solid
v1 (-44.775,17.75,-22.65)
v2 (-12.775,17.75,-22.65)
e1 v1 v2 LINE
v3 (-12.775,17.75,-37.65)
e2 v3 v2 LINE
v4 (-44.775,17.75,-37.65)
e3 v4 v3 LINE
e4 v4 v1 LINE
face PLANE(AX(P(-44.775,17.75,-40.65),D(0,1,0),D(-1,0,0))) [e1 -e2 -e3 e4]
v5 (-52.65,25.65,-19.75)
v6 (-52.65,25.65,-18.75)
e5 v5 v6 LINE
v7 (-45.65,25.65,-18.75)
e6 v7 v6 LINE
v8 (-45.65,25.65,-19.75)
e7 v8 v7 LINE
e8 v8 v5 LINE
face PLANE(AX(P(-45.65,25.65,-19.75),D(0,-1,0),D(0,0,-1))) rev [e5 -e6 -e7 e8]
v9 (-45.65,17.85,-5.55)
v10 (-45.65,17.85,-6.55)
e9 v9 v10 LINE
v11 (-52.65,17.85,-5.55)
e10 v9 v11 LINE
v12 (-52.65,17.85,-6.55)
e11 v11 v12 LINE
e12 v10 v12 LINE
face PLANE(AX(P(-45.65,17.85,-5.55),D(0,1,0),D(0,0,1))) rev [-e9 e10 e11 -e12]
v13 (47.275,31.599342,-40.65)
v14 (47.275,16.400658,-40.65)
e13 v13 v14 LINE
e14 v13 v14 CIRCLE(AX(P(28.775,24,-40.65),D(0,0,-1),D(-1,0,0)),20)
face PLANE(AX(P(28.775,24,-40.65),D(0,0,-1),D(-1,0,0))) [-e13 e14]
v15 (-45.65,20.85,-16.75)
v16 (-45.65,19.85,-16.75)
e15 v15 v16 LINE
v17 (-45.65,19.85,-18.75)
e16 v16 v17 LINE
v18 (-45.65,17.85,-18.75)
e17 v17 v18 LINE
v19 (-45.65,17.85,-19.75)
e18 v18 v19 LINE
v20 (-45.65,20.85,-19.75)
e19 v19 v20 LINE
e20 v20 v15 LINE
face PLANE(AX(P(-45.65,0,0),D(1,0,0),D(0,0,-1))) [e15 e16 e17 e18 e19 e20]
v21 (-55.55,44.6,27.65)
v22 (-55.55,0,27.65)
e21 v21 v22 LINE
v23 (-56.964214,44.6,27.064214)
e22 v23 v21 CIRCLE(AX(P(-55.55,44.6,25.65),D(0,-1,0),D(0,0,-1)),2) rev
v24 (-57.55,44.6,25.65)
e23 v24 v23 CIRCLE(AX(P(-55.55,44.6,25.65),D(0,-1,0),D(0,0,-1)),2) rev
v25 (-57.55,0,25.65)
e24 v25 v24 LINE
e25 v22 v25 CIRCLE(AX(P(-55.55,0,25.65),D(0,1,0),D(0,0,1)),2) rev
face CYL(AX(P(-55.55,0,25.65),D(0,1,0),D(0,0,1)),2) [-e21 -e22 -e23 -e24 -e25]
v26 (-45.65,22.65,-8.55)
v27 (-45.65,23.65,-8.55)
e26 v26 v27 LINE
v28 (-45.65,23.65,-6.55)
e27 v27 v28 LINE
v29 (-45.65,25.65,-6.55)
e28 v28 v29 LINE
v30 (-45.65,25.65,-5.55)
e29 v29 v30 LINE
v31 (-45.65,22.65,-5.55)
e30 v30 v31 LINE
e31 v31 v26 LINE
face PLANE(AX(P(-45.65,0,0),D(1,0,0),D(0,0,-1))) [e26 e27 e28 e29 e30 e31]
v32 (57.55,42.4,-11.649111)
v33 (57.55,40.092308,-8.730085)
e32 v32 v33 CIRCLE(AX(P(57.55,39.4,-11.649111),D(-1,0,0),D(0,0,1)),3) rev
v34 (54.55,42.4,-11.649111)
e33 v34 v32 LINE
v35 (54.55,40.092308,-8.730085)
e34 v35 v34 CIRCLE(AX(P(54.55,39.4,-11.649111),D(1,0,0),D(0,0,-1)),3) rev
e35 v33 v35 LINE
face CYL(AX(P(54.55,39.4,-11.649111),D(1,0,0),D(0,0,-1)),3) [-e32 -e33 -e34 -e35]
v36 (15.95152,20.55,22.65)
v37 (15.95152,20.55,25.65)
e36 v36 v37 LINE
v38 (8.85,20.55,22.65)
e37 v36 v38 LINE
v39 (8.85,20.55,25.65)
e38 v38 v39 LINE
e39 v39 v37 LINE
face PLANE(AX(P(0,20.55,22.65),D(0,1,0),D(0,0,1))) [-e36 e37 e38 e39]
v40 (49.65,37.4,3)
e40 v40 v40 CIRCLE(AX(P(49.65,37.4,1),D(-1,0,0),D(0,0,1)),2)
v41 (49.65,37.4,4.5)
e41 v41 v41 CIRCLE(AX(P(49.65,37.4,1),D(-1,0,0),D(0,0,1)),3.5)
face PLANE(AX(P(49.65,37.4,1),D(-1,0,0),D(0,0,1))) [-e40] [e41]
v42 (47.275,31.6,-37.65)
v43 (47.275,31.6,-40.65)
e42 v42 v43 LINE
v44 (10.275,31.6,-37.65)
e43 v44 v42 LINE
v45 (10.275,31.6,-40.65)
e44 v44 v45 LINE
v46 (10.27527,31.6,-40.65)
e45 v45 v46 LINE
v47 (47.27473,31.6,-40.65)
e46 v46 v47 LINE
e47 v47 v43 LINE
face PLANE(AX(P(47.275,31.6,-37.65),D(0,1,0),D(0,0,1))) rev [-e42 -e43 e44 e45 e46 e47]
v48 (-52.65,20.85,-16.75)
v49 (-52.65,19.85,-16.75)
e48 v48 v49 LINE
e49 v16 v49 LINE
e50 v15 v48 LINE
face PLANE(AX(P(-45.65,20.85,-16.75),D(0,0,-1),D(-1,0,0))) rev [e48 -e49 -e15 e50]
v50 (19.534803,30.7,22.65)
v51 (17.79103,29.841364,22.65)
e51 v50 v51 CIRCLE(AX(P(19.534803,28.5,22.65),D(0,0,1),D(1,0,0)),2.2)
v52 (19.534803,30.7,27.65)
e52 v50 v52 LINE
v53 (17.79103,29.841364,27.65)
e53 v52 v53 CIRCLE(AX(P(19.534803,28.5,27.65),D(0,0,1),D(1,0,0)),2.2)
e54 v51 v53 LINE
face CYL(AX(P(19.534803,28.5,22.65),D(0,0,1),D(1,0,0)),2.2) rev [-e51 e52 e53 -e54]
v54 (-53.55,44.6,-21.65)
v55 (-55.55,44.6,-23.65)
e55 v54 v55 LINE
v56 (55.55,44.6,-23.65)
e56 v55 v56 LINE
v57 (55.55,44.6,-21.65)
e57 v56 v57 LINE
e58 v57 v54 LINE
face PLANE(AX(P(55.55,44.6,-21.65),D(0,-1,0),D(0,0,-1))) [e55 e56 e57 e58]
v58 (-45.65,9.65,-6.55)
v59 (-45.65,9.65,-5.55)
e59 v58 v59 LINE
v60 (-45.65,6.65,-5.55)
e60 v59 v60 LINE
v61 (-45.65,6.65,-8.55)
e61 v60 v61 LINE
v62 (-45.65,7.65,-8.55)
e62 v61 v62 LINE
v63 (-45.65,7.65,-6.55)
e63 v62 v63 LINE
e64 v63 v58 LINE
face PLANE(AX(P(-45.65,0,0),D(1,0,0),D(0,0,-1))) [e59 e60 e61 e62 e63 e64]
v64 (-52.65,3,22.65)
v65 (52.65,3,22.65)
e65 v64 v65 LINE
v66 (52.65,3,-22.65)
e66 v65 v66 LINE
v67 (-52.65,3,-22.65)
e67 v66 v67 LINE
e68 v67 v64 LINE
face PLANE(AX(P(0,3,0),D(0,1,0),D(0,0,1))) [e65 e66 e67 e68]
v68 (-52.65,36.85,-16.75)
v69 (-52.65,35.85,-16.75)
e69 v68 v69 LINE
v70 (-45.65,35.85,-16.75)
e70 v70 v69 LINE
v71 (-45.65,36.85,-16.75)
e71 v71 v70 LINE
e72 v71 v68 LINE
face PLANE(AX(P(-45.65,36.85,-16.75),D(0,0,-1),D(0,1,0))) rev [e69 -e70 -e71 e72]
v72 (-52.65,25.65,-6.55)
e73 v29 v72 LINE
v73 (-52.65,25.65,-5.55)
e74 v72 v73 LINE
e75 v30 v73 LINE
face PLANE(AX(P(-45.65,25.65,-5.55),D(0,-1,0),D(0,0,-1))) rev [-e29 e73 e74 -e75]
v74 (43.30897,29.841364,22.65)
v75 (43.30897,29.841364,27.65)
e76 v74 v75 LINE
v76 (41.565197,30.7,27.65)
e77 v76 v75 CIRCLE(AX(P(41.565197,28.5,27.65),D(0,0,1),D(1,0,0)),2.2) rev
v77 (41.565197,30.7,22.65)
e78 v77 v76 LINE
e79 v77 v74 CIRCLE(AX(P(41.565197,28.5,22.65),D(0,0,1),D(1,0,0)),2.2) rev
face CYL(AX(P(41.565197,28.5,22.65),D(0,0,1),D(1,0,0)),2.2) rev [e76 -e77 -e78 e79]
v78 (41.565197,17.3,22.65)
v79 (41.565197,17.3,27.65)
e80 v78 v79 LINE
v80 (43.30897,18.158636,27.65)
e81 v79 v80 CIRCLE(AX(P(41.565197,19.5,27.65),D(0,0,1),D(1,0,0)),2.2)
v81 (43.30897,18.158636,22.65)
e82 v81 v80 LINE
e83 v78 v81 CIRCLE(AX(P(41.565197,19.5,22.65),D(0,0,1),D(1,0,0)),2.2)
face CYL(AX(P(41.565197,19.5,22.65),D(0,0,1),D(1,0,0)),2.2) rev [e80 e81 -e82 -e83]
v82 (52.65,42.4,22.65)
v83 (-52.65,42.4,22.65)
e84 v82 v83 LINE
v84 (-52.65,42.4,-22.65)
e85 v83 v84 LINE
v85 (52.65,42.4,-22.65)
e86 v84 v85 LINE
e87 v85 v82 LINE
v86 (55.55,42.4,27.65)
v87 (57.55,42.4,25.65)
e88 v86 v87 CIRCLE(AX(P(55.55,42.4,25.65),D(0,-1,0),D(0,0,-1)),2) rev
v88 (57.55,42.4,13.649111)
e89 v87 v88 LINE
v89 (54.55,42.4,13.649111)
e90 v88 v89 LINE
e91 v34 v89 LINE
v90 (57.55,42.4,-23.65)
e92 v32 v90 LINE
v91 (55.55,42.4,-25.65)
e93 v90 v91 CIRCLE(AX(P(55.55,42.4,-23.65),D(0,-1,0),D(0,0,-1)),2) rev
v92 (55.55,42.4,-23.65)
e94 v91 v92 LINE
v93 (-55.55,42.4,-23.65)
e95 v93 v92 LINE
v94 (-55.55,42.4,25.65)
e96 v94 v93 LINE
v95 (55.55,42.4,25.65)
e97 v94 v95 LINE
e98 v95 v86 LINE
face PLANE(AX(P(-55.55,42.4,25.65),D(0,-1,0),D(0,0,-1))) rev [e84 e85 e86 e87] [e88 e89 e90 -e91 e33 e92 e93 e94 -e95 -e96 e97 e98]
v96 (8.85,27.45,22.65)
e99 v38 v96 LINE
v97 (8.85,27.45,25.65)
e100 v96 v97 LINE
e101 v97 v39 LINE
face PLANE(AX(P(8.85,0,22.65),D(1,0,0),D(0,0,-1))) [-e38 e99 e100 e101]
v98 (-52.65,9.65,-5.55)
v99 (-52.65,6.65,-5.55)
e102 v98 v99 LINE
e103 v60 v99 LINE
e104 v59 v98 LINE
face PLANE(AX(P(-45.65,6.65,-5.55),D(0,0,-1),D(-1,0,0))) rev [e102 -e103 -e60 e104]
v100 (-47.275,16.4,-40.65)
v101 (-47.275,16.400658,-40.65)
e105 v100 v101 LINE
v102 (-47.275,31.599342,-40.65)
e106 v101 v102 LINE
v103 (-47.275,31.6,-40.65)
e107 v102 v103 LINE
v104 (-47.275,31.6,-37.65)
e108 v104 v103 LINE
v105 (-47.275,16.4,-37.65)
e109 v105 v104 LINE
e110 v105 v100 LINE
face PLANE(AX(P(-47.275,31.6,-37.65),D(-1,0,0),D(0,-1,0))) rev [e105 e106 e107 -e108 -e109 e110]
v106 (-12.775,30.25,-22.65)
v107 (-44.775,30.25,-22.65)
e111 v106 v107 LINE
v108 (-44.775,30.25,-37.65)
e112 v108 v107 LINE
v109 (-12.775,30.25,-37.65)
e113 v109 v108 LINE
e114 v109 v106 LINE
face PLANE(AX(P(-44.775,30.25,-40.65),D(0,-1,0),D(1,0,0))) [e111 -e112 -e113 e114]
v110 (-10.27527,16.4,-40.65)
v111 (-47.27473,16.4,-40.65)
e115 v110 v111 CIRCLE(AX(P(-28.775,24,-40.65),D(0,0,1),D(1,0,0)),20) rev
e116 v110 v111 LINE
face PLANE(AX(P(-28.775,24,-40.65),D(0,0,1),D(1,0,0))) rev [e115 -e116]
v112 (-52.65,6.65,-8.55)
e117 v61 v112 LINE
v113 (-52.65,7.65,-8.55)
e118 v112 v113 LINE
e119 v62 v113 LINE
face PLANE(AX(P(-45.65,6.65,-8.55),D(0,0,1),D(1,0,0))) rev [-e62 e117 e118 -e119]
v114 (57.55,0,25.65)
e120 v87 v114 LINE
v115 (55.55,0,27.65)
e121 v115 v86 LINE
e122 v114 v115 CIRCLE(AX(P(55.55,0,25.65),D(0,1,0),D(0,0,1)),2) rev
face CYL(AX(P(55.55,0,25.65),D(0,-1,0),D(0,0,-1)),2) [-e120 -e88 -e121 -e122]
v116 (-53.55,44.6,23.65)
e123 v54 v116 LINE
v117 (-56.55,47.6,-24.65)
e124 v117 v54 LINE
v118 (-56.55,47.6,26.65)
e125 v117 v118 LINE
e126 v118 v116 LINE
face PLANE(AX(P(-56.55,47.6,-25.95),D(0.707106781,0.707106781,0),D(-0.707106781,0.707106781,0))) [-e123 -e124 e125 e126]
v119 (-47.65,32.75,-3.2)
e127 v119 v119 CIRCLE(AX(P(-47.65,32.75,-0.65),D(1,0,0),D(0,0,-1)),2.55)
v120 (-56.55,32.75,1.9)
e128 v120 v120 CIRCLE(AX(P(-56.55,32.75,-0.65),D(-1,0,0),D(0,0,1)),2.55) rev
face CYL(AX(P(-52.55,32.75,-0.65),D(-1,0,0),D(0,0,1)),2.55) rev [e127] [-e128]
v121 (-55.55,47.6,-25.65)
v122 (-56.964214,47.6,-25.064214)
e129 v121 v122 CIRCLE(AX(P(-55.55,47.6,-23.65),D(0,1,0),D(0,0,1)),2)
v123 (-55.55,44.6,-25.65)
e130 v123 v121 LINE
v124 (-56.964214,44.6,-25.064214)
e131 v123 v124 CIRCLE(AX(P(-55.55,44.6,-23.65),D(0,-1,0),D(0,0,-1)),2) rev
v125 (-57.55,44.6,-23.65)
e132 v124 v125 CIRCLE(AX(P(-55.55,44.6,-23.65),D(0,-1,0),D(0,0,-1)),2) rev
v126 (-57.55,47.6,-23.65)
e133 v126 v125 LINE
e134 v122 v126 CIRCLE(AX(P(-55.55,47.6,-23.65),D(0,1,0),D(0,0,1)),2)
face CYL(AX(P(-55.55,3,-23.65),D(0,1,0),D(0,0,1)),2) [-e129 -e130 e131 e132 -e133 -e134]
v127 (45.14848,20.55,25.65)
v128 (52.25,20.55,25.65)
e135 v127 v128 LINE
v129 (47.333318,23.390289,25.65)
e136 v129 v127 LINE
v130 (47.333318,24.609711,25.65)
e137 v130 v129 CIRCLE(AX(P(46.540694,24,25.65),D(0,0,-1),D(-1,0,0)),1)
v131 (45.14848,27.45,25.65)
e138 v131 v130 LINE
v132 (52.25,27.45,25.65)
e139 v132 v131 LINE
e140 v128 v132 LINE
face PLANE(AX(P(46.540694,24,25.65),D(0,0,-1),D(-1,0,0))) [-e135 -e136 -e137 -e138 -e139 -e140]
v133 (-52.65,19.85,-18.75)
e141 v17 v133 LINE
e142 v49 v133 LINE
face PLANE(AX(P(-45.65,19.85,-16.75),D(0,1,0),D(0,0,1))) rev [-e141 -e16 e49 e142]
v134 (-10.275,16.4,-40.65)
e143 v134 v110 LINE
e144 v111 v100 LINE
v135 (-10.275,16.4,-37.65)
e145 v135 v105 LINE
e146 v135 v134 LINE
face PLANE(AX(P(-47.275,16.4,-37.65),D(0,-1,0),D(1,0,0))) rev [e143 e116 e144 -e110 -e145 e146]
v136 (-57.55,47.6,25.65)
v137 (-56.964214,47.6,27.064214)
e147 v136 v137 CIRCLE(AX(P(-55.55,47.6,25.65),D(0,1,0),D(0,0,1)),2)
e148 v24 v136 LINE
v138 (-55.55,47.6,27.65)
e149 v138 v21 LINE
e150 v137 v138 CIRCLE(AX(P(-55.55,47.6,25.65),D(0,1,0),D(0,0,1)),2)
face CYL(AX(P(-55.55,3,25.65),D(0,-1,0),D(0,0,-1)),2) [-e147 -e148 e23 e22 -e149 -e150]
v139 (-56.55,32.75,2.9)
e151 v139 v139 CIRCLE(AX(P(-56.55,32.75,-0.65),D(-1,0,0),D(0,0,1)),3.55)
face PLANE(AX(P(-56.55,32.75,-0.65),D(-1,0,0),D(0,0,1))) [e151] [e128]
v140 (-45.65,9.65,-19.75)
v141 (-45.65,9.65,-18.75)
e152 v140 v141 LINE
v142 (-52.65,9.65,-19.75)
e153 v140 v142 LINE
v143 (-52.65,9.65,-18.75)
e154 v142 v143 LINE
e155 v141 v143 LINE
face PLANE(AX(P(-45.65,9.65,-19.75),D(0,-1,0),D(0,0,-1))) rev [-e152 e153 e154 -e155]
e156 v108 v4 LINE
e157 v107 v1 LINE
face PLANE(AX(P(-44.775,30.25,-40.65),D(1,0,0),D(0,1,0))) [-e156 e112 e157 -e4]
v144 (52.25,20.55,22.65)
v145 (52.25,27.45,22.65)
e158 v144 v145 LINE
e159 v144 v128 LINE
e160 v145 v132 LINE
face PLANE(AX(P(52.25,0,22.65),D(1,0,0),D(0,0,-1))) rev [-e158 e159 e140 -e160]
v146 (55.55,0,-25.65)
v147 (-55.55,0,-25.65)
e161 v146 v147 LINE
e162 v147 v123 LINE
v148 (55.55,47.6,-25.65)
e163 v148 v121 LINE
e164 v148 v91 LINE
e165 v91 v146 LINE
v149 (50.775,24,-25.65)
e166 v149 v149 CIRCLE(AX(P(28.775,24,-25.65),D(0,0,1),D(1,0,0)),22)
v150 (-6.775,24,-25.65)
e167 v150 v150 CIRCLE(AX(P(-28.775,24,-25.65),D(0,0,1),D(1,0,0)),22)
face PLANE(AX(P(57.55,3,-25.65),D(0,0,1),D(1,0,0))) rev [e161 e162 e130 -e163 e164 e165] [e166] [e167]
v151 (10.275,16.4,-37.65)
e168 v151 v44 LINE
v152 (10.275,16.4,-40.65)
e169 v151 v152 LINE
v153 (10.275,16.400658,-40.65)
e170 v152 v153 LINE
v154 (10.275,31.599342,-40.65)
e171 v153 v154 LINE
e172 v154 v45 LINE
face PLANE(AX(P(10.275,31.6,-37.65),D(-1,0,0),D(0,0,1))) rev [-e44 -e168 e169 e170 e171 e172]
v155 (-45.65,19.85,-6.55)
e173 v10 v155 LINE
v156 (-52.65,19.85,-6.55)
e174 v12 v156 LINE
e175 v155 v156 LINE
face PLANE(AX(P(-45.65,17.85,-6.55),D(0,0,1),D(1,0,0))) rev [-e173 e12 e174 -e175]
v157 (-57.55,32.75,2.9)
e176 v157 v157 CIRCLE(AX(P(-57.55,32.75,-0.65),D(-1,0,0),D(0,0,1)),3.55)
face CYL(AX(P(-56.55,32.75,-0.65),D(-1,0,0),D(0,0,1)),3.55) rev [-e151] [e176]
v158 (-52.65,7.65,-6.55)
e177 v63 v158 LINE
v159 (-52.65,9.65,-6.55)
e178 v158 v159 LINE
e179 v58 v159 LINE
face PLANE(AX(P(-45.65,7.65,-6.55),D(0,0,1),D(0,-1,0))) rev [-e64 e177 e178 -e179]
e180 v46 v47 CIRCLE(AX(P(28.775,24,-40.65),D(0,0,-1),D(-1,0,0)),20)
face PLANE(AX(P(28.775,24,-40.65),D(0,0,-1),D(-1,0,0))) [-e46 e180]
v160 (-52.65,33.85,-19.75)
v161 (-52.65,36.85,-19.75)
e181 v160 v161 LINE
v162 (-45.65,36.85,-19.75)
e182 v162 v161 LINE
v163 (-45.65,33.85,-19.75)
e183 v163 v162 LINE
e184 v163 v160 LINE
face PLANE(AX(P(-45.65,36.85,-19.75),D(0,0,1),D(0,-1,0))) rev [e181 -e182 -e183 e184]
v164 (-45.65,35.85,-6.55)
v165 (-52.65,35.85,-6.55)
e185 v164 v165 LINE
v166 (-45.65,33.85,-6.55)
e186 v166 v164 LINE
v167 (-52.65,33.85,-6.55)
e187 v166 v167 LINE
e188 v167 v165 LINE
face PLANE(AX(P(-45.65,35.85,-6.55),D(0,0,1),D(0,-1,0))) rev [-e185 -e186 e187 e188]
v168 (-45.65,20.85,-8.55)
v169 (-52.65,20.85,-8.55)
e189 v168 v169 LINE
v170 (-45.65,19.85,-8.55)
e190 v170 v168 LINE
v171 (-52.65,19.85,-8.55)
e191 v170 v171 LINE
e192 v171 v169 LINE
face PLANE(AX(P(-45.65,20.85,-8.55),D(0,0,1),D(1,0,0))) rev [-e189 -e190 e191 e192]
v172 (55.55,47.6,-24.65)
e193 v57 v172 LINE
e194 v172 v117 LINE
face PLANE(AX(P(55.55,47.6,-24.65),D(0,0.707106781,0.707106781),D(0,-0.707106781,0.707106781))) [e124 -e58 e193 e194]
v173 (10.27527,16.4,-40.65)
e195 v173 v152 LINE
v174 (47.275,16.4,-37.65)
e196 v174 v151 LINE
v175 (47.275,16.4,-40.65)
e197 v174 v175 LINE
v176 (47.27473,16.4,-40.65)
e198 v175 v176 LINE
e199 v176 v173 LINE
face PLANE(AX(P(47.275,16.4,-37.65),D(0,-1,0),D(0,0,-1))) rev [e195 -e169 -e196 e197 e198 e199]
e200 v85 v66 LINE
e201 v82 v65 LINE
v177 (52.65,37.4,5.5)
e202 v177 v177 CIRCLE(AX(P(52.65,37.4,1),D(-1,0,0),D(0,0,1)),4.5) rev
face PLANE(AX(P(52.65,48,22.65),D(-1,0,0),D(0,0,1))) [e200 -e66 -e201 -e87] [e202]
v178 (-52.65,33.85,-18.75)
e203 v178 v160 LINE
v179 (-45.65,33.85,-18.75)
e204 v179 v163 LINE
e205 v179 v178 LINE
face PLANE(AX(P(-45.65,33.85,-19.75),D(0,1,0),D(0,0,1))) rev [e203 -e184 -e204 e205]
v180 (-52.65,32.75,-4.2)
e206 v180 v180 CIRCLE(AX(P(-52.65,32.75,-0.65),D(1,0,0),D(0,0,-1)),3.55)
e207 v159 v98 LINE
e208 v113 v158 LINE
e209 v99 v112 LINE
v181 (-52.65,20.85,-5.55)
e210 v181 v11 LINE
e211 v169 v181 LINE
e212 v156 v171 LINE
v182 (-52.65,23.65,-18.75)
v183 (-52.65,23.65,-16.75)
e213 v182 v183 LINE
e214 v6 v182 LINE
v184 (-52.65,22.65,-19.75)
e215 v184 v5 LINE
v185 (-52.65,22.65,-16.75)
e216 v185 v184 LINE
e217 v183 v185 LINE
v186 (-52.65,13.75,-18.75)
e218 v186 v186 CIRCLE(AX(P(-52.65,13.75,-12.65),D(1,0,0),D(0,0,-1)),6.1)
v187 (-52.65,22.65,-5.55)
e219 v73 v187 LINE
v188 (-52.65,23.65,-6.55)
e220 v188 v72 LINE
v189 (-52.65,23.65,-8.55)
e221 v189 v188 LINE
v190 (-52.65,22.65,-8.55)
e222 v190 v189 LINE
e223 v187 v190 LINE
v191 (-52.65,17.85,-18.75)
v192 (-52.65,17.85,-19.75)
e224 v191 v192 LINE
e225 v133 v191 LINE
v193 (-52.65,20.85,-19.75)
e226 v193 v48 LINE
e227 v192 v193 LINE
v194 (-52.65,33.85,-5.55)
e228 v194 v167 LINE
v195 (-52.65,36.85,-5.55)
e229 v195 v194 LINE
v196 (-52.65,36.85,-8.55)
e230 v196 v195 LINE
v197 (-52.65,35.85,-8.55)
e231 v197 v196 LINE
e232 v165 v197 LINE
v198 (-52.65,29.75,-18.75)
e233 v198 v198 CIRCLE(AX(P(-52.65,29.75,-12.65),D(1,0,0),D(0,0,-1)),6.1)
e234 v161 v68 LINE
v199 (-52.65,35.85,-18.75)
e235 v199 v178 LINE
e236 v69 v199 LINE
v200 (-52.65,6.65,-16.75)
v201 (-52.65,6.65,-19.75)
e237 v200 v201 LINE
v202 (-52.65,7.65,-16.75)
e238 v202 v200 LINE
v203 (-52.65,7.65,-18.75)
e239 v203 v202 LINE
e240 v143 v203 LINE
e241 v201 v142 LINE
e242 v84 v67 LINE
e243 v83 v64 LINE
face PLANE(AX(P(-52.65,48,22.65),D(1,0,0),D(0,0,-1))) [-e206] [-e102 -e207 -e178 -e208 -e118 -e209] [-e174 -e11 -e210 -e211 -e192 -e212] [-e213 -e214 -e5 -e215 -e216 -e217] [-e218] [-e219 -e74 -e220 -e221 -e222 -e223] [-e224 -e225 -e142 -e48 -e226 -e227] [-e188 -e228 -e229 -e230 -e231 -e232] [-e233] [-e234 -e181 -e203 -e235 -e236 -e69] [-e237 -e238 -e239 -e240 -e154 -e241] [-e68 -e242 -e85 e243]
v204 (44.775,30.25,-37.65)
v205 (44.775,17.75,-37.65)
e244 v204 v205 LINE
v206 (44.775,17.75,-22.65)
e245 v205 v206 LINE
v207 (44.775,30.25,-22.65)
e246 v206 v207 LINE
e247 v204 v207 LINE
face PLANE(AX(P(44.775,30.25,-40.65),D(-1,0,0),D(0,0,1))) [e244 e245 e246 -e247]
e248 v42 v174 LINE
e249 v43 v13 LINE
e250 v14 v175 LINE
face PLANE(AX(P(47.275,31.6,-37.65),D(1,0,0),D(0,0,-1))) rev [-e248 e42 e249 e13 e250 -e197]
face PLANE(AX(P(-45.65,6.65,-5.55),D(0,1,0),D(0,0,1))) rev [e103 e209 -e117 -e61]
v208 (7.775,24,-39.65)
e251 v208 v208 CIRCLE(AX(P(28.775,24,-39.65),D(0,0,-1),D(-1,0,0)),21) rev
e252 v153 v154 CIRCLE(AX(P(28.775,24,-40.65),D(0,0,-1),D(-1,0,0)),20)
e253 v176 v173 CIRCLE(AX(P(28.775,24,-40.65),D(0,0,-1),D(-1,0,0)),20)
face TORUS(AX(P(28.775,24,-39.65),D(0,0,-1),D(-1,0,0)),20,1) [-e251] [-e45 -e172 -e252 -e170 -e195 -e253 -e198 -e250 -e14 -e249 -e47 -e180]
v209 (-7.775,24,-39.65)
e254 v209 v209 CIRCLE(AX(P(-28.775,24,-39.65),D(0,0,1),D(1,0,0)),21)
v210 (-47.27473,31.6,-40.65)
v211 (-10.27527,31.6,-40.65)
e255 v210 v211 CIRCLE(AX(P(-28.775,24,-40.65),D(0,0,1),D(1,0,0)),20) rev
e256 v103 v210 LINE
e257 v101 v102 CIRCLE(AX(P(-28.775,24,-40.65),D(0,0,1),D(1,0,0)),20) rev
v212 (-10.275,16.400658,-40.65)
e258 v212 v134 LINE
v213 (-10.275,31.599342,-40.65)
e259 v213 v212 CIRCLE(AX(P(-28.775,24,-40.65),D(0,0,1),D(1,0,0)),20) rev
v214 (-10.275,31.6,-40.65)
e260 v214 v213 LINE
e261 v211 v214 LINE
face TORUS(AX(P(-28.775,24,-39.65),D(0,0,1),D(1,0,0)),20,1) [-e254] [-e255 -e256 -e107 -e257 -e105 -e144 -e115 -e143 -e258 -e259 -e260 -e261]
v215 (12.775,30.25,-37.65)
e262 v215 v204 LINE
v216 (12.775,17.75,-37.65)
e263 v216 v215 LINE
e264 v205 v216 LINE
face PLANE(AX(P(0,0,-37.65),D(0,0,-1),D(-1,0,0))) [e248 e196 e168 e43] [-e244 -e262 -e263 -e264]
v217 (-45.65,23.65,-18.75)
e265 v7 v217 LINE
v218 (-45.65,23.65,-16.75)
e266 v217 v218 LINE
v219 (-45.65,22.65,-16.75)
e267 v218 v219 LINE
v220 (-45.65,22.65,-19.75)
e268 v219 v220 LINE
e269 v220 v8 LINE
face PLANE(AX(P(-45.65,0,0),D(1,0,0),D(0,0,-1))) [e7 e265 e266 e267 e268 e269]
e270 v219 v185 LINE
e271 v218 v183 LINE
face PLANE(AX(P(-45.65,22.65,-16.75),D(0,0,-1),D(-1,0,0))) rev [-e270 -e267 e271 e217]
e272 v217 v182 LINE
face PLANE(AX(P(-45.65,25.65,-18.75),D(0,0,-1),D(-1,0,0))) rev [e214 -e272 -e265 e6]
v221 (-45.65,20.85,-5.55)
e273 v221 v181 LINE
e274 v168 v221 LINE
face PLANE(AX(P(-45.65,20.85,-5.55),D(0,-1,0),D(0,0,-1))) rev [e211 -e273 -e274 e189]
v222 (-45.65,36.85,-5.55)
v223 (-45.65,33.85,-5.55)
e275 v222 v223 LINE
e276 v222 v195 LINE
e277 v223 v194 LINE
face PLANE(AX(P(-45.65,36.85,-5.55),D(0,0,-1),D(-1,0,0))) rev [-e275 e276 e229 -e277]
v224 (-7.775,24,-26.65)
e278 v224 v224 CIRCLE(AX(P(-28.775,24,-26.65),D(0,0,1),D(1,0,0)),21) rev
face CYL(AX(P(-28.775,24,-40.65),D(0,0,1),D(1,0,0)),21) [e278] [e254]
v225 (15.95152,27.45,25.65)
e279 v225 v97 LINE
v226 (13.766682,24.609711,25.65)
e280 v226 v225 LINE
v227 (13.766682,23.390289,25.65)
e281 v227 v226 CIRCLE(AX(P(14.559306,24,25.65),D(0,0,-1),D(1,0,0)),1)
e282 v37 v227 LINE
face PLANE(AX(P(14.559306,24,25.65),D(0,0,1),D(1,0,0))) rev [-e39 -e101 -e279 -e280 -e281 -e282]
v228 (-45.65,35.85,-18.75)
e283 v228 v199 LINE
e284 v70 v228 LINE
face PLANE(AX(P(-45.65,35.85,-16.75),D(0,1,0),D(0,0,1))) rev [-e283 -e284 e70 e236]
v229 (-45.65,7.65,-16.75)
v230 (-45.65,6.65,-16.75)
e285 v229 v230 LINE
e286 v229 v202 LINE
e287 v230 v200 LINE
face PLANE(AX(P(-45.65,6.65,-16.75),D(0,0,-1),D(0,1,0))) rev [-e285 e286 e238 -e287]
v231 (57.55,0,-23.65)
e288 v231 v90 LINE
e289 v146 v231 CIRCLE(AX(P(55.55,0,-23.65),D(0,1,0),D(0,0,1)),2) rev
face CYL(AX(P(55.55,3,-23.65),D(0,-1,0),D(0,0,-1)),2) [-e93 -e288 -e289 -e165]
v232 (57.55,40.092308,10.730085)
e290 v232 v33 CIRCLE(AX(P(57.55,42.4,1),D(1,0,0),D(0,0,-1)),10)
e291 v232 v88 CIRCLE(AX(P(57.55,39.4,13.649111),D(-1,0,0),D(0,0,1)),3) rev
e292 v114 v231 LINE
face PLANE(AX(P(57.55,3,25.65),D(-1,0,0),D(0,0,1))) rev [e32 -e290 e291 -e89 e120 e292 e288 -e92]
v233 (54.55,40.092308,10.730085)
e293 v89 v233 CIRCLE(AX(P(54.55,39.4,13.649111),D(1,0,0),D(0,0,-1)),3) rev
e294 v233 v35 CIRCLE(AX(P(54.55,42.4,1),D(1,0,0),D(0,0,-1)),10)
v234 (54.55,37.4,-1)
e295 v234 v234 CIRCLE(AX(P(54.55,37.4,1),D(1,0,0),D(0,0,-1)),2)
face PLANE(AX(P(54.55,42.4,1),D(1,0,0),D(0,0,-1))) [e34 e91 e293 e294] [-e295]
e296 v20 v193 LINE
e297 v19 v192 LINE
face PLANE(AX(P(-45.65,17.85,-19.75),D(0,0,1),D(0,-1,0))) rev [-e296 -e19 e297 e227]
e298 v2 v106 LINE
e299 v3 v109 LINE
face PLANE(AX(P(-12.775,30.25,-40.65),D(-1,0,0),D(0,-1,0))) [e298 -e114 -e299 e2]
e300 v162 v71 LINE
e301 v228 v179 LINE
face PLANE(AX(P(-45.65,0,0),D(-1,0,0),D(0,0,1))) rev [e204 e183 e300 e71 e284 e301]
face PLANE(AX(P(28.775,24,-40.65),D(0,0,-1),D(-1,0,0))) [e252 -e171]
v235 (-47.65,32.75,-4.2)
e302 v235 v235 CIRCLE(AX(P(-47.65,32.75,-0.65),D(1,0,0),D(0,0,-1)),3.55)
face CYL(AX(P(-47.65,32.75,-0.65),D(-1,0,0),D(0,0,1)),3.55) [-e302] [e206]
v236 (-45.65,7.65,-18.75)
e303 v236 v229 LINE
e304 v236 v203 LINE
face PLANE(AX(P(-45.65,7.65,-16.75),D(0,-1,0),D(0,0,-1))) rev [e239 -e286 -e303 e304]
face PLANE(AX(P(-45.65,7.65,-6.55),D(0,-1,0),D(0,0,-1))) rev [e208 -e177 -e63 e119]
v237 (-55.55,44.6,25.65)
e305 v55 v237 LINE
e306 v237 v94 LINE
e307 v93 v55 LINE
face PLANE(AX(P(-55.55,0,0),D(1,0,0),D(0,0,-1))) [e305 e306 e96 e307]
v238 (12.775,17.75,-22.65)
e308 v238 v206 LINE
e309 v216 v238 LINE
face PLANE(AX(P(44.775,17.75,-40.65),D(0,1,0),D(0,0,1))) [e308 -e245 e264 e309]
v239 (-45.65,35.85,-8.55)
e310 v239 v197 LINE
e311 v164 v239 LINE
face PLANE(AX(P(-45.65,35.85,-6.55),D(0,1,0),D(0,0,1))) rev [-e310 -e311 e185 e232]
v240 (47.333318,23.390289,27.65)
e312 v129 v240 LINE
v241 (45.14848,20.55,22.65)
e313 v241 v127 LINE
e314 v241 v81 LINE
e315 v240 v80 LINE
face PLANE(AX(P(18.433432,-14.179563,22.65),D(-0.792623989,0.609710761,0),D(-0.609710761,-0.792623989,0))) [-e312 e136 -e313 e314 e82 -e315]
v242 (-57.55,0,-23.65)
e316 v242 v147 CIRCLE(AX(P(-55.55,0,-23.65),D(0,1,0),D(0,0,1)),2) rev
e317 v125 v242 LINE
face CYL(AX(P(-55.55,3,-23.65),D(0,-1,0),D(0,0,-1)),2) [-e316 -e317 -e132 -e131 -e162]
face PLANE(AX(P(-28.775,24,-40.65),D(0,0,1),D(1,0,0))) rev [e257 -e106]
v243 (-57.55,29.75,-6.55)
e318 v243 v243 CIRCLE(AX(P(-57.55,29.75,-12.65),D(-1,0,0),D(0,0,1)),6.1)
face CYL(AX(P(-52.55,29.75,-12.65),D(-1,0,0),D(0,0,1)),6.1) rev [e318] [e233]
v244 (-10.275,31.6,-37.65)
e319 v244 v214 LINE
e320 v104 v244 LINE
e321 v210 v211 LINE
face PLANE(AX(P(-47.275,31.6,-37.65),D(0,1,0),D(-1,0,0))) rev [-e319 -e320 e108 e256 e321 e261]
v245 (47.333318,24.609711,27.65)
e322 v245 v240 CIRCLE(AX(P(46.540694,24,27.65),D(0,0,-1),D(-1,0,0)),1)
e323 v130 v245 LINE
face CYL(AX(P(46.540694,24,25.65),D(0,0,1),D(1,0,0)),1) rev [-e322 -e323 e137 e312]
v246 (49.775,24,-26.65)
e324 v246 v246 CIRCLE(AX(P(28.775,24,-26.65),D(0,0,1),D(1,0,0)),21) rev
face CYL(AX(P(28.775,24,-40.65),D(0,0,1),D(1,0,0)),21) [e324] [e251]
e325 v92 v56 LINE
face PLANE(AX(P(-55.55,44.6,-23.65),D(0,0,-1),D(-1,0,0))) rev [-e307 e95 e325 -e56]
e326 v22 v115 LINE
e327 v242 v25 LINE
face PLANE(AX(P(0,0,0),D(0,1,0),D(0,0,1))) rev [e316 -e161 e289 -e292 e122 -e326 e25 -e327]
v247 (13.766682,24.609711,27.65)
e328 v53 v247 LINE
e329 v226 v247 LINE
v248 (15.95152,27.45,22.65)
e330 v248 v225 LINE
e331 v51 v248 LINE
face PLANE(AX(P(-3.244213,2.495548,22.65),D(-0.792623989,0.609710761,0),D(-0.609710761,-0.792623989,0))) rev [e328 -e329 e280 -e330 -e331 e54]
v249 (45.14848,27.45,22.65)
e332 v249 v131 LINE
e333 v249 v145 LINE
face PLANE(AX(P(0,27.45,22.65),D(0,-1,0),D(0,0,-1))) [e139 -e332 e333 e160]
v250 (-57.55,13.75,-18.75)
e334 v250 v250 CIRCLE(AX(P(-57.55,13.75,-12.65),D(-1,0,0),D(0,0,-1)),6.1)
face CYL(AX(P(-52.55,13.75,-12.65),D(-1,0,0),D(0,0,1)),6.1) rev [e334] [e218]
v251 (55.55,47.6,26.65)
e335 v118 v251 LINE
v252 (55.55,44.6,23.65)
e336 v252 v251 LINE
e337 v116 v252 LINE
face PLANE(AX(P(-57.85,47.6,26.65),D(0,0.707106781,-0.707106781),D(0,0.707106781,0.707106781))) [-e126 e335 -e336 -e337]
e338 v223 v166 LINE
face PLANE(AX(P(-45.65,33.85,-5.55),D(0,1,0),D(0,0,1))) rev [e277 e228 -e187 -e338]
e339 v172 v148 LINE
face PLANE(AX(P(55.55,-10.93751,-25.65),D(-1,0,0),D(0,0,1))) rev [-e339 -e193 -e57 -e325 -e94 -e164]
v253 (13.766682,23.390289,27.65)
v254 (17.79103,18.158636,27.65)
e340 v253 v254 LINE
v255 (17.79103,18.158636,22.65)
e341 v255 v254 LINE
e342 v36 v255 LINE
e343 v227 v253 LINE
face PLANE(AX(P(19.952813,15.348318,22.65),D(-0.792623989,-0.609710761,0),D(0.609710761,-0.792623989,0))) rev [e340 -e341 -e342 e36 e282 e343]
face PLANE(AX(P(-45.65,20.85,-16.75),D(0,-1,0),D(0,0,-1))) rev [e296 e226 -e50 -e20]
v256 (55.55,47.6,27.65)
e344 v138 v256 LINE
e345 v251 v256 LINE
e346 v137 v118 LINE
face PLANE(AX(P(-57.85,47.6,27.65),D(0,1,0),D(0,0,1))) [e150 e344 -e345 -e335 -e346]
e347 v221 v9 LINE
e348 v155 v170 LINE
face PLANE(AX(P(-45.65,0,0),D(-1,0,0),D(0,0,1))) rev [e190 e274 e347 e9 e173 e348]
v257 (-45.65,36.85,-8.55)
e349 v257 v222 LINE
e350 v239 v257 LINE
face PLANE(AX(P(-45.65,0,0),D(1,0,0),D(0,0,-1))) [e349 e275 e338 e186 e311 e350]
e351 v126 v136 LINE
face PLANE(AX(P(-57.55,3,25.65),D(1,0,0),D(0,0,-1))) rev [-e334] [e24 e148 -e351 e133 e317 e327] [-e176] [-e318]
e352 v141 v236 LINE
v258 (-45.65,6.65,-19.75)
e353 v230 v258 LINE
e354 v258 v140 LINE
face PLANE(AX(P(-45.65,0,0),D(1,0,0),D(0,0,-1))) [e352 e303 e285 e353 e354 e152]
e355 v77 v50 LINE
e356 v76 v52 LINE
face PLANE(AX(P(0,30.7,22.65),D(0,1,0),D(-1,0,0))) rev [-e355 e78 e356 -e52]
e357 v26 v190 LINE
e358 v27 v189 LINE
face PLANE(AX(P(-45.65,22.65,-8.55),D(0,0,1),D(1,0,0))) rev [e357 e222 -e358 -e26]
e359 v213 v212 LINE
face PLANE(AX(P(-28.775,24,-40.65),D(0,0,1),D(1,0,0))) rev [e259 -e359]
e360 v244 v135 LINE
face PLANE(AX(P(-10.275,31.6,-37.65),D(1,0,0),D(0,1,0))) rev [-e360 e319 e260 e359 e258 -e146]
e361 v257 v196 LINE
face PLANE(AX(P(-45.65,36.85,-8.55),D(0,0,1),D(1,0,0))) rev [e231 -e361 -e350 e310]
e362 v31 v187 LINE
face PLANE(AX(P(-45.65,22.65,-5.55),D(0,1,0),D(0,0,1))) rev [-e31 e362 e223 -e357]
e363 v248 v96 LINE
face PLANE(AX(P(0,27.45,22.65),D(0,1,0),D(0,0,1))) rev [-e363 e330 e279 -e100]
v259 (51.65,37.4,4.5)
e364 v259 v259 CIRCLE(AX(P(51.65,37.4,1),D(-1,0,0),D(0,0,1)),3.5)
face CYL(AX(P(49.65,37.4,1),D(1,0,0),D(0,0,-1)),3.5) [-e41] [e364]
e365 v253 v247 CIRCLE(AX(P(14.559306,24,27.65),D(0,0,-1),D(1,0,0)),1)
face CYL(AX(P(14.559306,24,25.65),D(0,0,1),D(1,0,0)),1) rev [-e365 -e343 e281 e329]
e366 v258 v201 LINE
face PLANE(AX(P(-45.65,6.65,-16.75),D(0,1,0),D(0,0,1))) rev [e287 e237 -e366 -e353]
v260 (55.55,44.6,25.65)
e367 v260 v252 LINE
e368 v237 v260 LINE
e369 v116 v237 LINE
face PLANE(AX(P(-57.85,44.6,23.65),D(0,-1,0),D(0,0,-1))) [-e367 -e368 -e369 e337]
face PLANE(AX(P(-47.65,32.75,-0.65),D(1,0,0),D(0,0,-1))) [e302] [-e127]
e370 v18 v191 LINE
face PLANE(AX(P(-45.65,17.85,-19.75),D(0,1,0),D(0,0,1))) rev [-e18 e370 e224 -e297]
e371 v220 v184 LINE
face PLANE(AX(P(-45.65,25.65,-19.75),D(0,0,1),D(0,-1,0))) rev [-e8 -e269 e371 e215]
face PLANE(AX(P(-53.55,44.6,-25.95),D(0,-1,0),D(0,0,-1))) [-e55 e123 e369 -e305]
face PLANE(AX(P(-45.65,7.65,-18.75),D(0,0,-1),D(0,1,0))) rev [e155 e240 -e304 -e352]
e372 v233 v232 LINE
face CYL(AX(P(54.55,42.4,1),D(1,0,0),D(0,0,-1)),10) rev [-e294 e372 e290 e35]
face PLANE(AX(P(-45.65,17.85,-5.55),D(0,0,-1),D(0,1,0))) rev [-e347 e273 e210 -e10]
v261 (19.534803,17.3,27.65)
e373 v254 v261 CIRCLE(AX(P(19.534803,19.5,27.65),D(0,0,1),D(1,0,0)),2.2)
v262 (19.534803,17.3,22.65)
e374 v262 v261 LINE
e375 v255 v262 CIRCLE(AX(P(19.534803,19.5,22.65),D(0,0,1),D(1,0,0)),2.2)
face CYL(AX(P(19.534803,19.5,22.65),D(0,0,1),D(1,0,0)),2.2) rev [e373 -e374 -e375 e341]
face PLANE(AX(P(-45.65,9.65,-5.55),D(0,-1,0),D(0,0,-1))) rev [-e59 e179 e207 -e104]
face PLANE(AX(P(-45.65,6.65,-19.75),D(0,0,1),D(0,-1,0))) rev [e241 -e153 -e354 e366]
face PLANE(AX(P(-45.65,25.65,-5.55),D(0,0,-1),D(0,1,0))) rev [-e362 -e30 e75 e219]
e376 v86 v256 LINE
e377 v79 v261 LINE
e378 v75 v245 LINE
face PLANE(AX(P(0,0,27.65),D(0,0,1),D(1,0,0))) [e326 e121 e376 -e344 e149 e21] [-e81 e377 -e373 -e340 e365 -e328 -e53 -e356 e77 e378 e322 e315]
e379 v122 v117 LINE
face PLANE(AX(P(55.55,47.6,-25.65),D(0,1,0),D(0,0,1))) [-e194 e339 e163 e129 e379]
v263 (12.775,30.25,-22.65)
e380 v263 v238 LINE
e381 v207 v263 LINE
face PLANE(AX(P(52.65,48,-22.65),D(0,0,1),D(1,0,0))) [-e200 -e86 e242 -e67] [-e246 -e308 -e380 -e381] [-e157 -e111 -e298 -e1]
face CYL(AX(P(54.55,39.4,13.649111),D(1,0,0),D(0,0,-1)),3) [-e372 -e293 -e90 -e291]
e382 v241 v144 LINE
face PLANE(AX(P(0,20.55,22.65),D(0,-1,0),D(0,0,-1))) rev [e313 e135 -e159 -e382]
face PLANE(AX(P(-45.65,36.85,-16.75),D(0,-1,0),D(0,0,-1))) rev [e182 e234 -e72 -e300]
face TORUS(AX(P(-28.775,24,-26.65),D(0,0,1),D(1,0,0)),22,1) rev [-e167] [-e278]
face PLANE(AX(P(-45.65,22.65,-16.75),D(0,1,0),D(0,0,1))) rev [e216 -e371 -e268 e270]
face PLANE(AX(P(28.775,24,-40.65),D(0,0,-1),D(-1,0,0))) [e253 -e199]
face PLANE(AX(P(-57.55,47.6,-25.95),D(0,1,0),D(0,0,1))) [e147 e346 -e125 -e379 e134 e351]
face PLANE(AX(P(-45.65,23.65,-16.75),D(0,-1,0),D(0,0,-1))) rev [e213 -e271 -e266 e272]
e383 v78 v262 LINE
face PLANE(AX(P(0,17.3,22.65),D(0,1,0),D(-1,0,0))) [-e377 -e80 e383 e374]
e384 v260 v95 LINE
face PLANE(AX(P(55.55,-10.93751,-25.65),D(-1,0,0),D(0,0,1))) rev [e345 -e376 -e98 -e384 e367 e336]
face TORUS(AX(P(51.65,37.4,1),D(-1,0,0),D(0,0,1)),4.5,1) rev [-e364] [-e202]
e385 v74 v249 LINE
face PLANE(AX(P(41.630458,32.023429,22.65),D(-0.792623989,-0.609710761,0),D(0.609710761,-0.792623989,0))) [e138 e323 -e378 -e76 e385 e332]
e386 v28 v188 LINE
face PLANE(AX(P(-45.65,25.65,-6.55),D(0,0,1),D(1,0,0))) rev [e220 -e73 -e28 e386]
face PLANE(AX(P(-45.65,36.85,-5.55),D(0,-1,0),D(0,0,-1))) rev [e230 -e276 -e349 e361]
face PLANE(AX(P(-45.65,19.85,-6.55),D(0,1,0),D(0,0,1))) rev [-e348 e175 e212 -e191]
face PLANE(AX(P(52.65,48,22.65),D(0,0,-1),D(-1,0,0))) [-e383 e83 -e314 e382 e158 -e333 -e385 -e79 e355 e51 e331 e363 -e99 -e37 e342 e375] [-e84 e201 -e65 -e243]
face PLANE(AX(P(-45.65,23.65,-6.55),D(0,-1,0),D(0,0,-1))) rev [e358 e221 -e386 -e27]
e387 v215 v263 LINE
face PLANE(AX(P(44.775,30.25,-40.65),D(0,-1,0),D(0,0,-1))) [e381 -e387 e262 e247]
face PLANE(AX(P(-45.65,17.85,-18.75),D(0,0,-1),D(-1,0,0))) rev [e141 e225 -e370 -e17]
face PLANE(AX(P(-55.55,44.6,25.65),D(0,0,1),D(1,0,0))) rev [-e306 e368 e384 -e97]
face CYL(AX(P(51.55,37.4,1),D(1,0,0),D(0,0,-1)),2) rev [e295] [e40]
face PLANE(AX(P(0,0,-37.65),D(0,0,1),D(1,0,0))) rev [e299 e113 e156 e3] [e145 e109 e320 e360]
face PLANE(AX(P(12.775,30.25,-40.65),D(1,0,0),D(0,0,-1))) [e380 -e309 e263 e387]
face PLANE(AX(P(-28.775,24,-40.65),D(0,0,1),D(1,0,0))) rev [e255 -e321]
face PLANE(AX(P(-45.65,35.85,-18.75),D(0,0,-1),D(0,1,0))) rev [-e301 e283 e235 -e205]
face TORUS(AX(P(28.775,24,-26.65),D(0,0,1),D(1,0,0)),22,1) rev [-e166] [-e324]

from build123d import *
from OCP.BRepAlgoAPI import BRepAlgoAPI_Cut
from OCP.TopTools import TopTools_ListOfShape

# Parameters (mm, degrees)
SKETCH1_W            = 115.1
SKETCH1_H            = 51.3
BOSS_EXTRUDE1_DEPTH  = 3
SKETCH2_W            = 115.1
SKETCH2_H            = 51.3
SKETCH2_W_2          = 105.3
SKETCH2_H_2          = 45.3
BOSS_EXTRUDE2_DEPTH  = 45
SKETCH5_R            = 21
SKETCH5_W            = 32
SKETCH5_H            = 12.5
BOSS_EXTRUDE4_DEPTH  = 15
SKETCH10_W           = 115.1
SKETCH10_H           = 48
BOSS_EXTRUDE7_DEPTH  = 2
SKETCH11_W           = 32
SKETCH11_H           = 12.5
CUT_EXTRUDE1_DEPTH   = 12
SKETCH12_W           = 37
SKETCH12_H           = 15.2
CUT_EXTRUDE2_DEPTH   = 3
FILLET1_R            = 1
FILLET2_R            = 2
SKETCH14_R           = 6.1
SKETCH14_R_2         = 2.55
CUT_EXTRUDE4_DEPTH   = 5
SKETCH16_R           = 3.55
CUT_EXTRUDE5_DEPTH   = 1
SKETCH18_R           = 3.55
SKETCH18_R_2         = 2.55
BOSS_EXTRUDE9_DEPTH  = 5
CUT_EXTRUDE6_DEPTH   = 5
BOSS_EXTRUDE10_DEPTH = 7
BOSS_EXTRUDE11_DEPTH = 2
SKETCH28_W           = 49.3
SKETCH28_H           = 2.2
CUT_EXTRUDE9_DEPTH   = 113.1
SKETCH29_W           = 4.9
SKETCH29_H           = 45.3
CUT_EXTRUDE11_DEPTH  = 5.6
CUT_EXTRUDE12_START  = -5.6
SKETCH33_W           = 2
SKETCH33_H           = 53.3
CUT_EXTRUDE12_DEPTH  = 5.6
SKETCH34_R           = 10
CUT_EXTRUDE13_DEPTH  = 3
FILLET3_R            = 3
SKETCH35_R           = 2
CUT_EXTRUDE14_DEPTH  = 3
SKETCH37_R           = 3.5
SKETCH37_R_2         = 2
BOSS_EXTRUDE13_DEPTH = 3
FILLET5_R            = 1
SKETCH43_W           = 108.2
SKETCH43_H           = 3.4
BOSS_EXTRUDE14_DEPTH = 2
SKETCH41_W           = 53.3
SKETCH41_H           = 3.4
CUT_EXTRUDE16_DEPTH  = 130.414189717
FILLET7_R            = 2


with BuildPart() as part:
    # Sketch1 → Boss-Extrude1 (new body)
    with BuildSketch(Plane(origin=(0, 0, 0), x_dir=(1, 0, 0), z_dir=(0, 1, 0))):
        Rectangle(SKETCH1_W, SKETCH1_H)
    extrude(amount=BOSS_EXTRUDE1_DEPTH)

    # Sketch2 → Boss-Extrude2 (add)
    with BuildSketch(Plane(origin=(0, 3, 0), x_dir=(1, 0, 0), z_dir=(0, 1, 0))):
        Rectangle(SKETCH2_W, SKETCH2_H)
        Rectangle(SKETCH2_W_2, SKETCH2_H_2, mode=Mode.SUBTRACT)
    extrude(amount=BOSS_EXTRUDE2_DEPTH)

    # Sketch5 → Boss-Extrude4 (add)
    # profile 1 of 2: a face of its own
    with BuildSketch(Plane(origin=(0, 0, -25.65), x_dir=(-1, 0, 0), z_dir=(0, 0, -1))):
        with Locations((-28.775, 24)):
            Circle(SKETCH5_R)
        with Locations((-28.775, 24)):
            Rectangle(SKETCH5_W, SKETCH5_H, mode=Mode.SUBTRACT)
    # profile 2 of 2: a face of its own
    with BuildSketch(Plane(origin=(0, 0, -25.65), x_dir=(-1, 0, 0), z_dir=(0, 0, -1))):
        with Locations(Location((28.775, 24, 0), (0, 0, 180))):
            Circle(SKETCH5_R)
        with Locations((28.775, 24)):
            Rectangle(SKETCH5_W, SKETCH5_H, mode=Mode.SUBTRACT)
    extrude(amount=BOSS_EXTRUDE4_DEPTH)

    # Sketch10 → Boss-Extrude7 (add)
    with BuildSketch(Plane.XY.offset(25.65)):
        with Locations((0, 24)):
            Rectangle(SKETCH10_W, SKETCH10_H)
    extrude(amount=BOSS_EXTRUDE7_DEPTH)

    # Sketch11 → Cut-Extrude1 (cut)
    with BuildSketch(Plane(origin=(0, 0, -25.65), x_dir=(-1, 0, 0), z_dir=(0, 0, -1))):
        with Locations((28.775, 24)):
            Rectangle(SKETCH11_W, SKETCH11_H)
        with Locations((-28.775, 24)):
            Rectangle(SKETCH11_W, SKETCH11_H)
    extrude(amount=-CUT_EXTRUDE1_DEPTH, mode=Mode.SUBTRACT)

    # Sketch12 → Cut-Extrude2 (cut)
    with BuildSketch(Plane(origin=(0, 0, -40.65), x_dir=(-1, 0, 0), z_dir=(0, 0, -1))):
        with Locations((-28.775, 24)):
            Rectangle(SKETCH12_W, SKETCH12_H)
        with Locations((28.775, 24)):
            Rectangle(SKETCH12_W, SKETCH12_H)
    extrude(amount=-CUT_EXTRUDE2_DEPTH, mode=Mode.SUBTRACT)

    # Fillet1
    fillet1_edges = [part.edges().sort_by_distance(p)[0] for p in [
        (49.775, 24, -25.65),
        (-49.775, 24, -25.65),
    ]]
    fillet(fillet1_edges, radius=FILLET1_R)
    fillet1_2_edges = [part.edges().sort_by_distance(p)[0] for p in [
        (49.775, 24, -40.65),
        (-49.775, 24, -40.65),
    ]]
    fillet(fillet1_2_edges, radius=FILLET1_R - 0.0004)  # a hair under: the kernel refuses the full size

    # Fillet2
    fillet2_edges = [part.edges().sort_by_distance(p)[0] for p in [
        (-57.55, 24, 27.65),
        (57.55, 24, 27.65),
        (-57.55, 24, -25.65),
        (57.55, 24, -25.65),
    ]]
    fillet(fillet2_edges, radius=FILLET2_R)

    # Sketch14 → Cut-Extrude4 (cut)
    with BuildSketch(Plane.ZY.offset(57.55)):
        with Locations((-12.65, 29.75)):
            Circle(SKETCH14_R)
        with Locations(Location((-12.65, 13.75, 0), (0, 0, 180))):
            Circle(SKETCH14_R)
        with Locations((-0.65, 32.75)):
            Circle(SKETCH14_R_2)
    extrude(amount=-CUT_EXTRUDE4_DEPTH, mode=Mode.SUBTRACT)

    # Sketch16 → Cut-Extrude5 (cut)
    with BuildSketch(Plane.ZY.offset(57.55)):
        with Locations((-0.65, 32.75)):
            Circle(SKETCH16_R)
    extrude(amount=-CUT_EXTRUDE5_DEPTH, mode=Mode.SUBTRACT)

    # Sketch18 → Boss-Extrude9 (add)
    with BuildSketch(Plane(origin=(-52.65, 0, 0), x_dir=(0, 0, -1), z_dir=(1, 0, 0))):
        with Locations(Location((0.65, 32.75, 0), (0, 0, 180))):
            Circle(SKETCH18_R)
        with Locations(Location((0.65, 32.75, 0), (0, 0, 180))):
            Circle(SKETCH18_R_2, mode=Mode.SUBTRACT)
    extrude(amount=BOSS_EXTRUDE9_DEPTH)

    # Sketch17 → Cut-Extrude6 (cut)
    with BuildSketch(Plane.XY.offset(27.65)):
        with BuildLine():
            Line((15.951519701, 20.55), (17.791030219, 18.158636326))
            ThreePointArc((17.791030219, 18.158636326), (18.562949118, 17.526297884), (19.534802995, 17.3))
            Line((19.534802995, 17.3), (41.565197005, 17.3))
            ThreePointArc((41.565197005, 17.3), (42.537050882, 17.526297884), (43.308969781, 18.158636326))
            Line((43.308969781, 18.158636326), (45.148480299, 20.55))
            Line((45.148480299, 20.55), (52.25, 20.55))
            Line((52.25, 20.55), (52.25, 27.45))
            Line((52.25, 27.45), (45.148480299, 27.45))
            Line((45.148480299, 27.45), (43.308969781, 29.841363674))
            ThreePointArc((43.308969781, 29.841363674), (42.537050882, 30.473702116), (41.565197005, 30.7))
            Line((41.565197005, 30.7), (19.534802995, 30.7))
            ThreePointArc((19.534802995, 30.7), (18.562949118, 30.473702116), (17.791030219, 29.841363674))
            Line((17.791030219, 29.841363674), (15.951519701, 27.45))
            Line((15.951519701, 27.45), (8.85, 27.45))
            Line((8.85, 27.45), (8.85, 20.55))
            Line((8.85, 20.55), (15.951519701, 20.55))
        make_face()
    extrude(amount=-CUT_EXTRUDE6_DEPTH, mode=Mode.SUBTRACT)

    # Sketch23 → Boss-Extrude10 (add)
    with BuildSketch(Plane(origin=(-52.65, 0, 0), x_dir=(0, 0, -1), z_dir=(1, 0, 0))):
        Polygon((5.55, 33.85), (6.55, 33.85), (6.55, 35.85), (8.55, 35.85), (8.55, 36.85), (5.55, 36.85), align=None)
        Polygon((6.55, 23.65), (8.55, 23.65), (8.55, 22.65), (5.55, 22.65), (5.55, 25.65), (6.55, 25.65), align=None)
        Polygon((18.75, 35.85), (18.75, 33.85), (19.75, 33.85), (19.75, 36.85), (16.75, 36.85), (16.75, 35.85), align=None)
        Polygon((16.75, 22.65), (16.75, 23.65), (18.75, 23.65), (18.75, 25.65), (19.75, 25.65), (19.75, 22.65), align=None)
        Polygon((19.75, 6.65), (19.75, 9.65), (18.75, 9.65), (18.75, 7.65), (16.75, 7.65), (16.75, 6.65), align=None)
        Polygon((5.55, 20.85), (8.55, 20.85), (8.55, 19.85), (6.55, 19.85), (6.55, 17.85), (5.55, 17.85), align=None)
        Polygon((5.55, 6.65), (5.55, 9.65), (6.55, 9.65), (6.55, 7.65), (8.55, 7.65), (8.55, 6.65), align=None)
        Polygon((16.75, 20.85), (16.75, 19.85), (18.75, 19.85), (18.75, 17.85), (19.75, 17.85), (19.75, 20.85), align=None)
    extrude(amount=BOSS_EXTRUDE10_DEPTH)

    # Sketch25 → Boss-Extrude11 (add)
    with BuildSketch(Plane.XY.offset(27.65)):
        with BuildLine():
            Line((15.951519701, 27.45), (13.766681824, 24.609710761))
            ThreePointArc((13.766681824, 24.609710761), (13.559305813, 24), (13.766681824, 23.390289239))
            Line((13.766681824, 23.390289239), (15.951519701, 20.55))
            Line((15.951519701, 20.55), (8.85, 20.55))
            Line((8.85, 20.55), (8.85, 27.45))
            Line((8.85, 27.45), (15.951519701, 27.45))
        make_face()
        with BuildLine():
            Line((45.148480299, 27.45), (47.333318176, 24.609710761))
            ThreePointArc((47.333318176, 24.609710761), (47.540694187, 24), (47.333318176, 23.390289239))
            Line((47.333318176, 23.390289239), (45.148480299, 20.55))
            Line((45.148480299, 20.55), (52.25, 20.55))
            Line((52.25, 20.55), (52.25, 27.45))
            Line((52.25, 27.45), (45.148480299, 27.45))
        make_face()
    extrude(amount=-BOSS_EXTRUDE11_DEPTH)

    # Sketch28 → Cut-Extrude9 (cut)
    with BuildSketch(Plane(origin=(57.55, 0, 0), x_dir=(0, 0, -1), z_dir=(1, 0, 0))):
        with Locations((-1, 43.5)):
            Rectangle(SKETCH28_W, SKETCH28_H)
    extrude(amount=-CUT_EXTRUDE9_DEPTH, mode=Mode.SUBTRACT)

    # Sketch29 → Cut-Extrude11 (cut)
    with BuildSketch(Plane(origin=(0, 48, 0), x_dir=(1, 0, 0), z_dir=(0, 1, 0))):
        with Locations((55.1, 0)):
            Rectangle(SKETCH29_W, SKETCH29_H)
    extrude(amount=-CUT_EXTRUDE11_DEPTH, mode=Mode.SUBTRACT)


with BuildPart() as cut_extrude12_tool:
    # Sketch33 → Cut-Extrude12 (new body)
    with BuildSketch(Plane(origin=(0, 48, 0), x_dir=(1, 0, 0), z_dir=(0, 1, 0)).offset(CUT_EXTRUDE12_START)):
        with Locations((56.55, -1)):
            Rectangle(SKETCH33_W, SKETCH33_H)
    extrude(amount=CUT_EXTRUDE12_DEPTH)


with BuildPart() as part_1:
    add(part.part)

    # Cut-Extrude12: cut by cut_extrude12_tool, with a tolerance
    cut_extrude12_stock = TopTools_ListOfShape()
    cut_extrude12_stock.Append(part_1.part.wrapped)
    cut_extrude12_tools = TopTools_ListOfShape()
    cut_extrude12_tools.Append(cut_extrude12_tool.part.wrapped)
    cut_extrude12_cut = BRepAlgoAPI_Cut()
    cut_extrude12_cut.SetArguments(cut_extrude12_stock)
    cut_extrude12_cut.SetTools(cut_extrude12_tools)
    cut_extrude12_cut.SetFuzzyValue(0.00001)
    cut_extrude12_cut.Build()
    add(Compound.cast(cut_extrude12_cut.Shape()).solids(), mode=Mode.REPLACE)

    # Sketch34 → Cut-Extrude13 (cut)
    with BuildSketch(Plane(origin=(57.55, 0, 0), x_dir=(0, 0, -1), z_dir=(1, 0, 0))):
        with Locations((-1, 42.4)):
            Circle(SKETCH34_R)
    extrude(amount=-CUT_EXTRUDE13_DEPTH, mode=Mode.SUBTRACT)

    # Fillet3
    fillet3_edges = [part_1.edges().sort_by_distance(p)[0] for p in [
        (56.05, 42.4, 11),
        (56.05, 42.4, -9),
    ]]
    fillet(fillet3_edges, radius=FILLET3_R)

    # Sketch35 → Cut-Extrude14 (cut)
    with BuildSketch(Plane(origin=(54.55, 0, 0), x_dir=(0, 0, -1), z_dir=(1, 0, 0))):
        with Locations((-1, 37.4)):
            Circle(SKETCH35_R)
    extrude(amount=-CUT_EXTRUDE14_DEPTH, mode=Mode.SUBTRACT)

    # Sketch37 → Boss-Extrude13 (add)
    with BuildSketch(Plane.ZY.offset(-52.65)):
        with Locations((1, 37.4)):
            Circle(SKETCH37_R)
        with Locations(Location((1, 37.4, 0), (0, 0, 180))):
            Circle(SKETCH37_R_2, mode=Mode.SUBTRACT)
    extrude(amount=BOSS_EXTRUDE13_DEPTH)

    # Fillet5
    fillet5_edges = [part_1.edges().sort_by_distance(p)[0] for p in [
        (52.65, 37.4, -2.5),
    ]]
    fillet(fillet5_edges, radius=FILLET5_R)

    # Sketch43 → Boss-Extrude14 (add)
    with BuildSketch(Plane.XY.offset(-22.65)):
        with Locations((1.45, 46.3)):
            Rectangle(SKETCH43_W, SKETCH43_H)
    extrude(amount=BOSS_EXTRUDE14_DEPTH)

    # Sketch41 → Cut-Extrude16 (cut, through all)
    with BuildSketch(Plane(origin=(55.55, 0, 0), x_dir=(0, 0, -1), z_dir=(1, 0, 0))):
        with Locations((-1, 46.3)):
            Rectangle(SKETCH41_W, SKETCH41_H)
    extrude(amount=-CUT_EXTRUDE16_DEPTH, mode=Mode.SUBTRACT)

    # Sweep2: sweep along a path in Sketch44
    with BuildLine(Plane(origin=(0, 44.6, 0), x_dir=(1, 0, 0), z_dir=(0, 1, 0))) as sweep2_path:
        Line((55.55, 23.65), (-55.55, 23.65))
        Line((-55.55, 23.65), (-55.55, -25.65))
        Line((-55.55, -25.65), (55.55, -25.65))
    # Sketch42 → Sweep2 (sweep)
    with BuildSketch(Plane(origin=(55.55, 0, 0), x_dir=(0, 0, -1), z_dir=(1, 0, 0))):
        Polygon((-27.65, 44.6), (-27.65, 47.6), (-26.65, 47.6), (-23.65, 44.6), align=None)
    sweep(path=sweep2_path.line, transition=Transition.RIGHT)

    # Fillet7
    fillet7_edges = [part_1.edges().sort_by_distance(p)[0] for p in [
        (-57.55, 46.1, 27.65),
        (-57.55, 46.1, -25.65),
    ]]
    fillet(fillet7_edges, radius=FILLET7_R)


solid = part_1.part
